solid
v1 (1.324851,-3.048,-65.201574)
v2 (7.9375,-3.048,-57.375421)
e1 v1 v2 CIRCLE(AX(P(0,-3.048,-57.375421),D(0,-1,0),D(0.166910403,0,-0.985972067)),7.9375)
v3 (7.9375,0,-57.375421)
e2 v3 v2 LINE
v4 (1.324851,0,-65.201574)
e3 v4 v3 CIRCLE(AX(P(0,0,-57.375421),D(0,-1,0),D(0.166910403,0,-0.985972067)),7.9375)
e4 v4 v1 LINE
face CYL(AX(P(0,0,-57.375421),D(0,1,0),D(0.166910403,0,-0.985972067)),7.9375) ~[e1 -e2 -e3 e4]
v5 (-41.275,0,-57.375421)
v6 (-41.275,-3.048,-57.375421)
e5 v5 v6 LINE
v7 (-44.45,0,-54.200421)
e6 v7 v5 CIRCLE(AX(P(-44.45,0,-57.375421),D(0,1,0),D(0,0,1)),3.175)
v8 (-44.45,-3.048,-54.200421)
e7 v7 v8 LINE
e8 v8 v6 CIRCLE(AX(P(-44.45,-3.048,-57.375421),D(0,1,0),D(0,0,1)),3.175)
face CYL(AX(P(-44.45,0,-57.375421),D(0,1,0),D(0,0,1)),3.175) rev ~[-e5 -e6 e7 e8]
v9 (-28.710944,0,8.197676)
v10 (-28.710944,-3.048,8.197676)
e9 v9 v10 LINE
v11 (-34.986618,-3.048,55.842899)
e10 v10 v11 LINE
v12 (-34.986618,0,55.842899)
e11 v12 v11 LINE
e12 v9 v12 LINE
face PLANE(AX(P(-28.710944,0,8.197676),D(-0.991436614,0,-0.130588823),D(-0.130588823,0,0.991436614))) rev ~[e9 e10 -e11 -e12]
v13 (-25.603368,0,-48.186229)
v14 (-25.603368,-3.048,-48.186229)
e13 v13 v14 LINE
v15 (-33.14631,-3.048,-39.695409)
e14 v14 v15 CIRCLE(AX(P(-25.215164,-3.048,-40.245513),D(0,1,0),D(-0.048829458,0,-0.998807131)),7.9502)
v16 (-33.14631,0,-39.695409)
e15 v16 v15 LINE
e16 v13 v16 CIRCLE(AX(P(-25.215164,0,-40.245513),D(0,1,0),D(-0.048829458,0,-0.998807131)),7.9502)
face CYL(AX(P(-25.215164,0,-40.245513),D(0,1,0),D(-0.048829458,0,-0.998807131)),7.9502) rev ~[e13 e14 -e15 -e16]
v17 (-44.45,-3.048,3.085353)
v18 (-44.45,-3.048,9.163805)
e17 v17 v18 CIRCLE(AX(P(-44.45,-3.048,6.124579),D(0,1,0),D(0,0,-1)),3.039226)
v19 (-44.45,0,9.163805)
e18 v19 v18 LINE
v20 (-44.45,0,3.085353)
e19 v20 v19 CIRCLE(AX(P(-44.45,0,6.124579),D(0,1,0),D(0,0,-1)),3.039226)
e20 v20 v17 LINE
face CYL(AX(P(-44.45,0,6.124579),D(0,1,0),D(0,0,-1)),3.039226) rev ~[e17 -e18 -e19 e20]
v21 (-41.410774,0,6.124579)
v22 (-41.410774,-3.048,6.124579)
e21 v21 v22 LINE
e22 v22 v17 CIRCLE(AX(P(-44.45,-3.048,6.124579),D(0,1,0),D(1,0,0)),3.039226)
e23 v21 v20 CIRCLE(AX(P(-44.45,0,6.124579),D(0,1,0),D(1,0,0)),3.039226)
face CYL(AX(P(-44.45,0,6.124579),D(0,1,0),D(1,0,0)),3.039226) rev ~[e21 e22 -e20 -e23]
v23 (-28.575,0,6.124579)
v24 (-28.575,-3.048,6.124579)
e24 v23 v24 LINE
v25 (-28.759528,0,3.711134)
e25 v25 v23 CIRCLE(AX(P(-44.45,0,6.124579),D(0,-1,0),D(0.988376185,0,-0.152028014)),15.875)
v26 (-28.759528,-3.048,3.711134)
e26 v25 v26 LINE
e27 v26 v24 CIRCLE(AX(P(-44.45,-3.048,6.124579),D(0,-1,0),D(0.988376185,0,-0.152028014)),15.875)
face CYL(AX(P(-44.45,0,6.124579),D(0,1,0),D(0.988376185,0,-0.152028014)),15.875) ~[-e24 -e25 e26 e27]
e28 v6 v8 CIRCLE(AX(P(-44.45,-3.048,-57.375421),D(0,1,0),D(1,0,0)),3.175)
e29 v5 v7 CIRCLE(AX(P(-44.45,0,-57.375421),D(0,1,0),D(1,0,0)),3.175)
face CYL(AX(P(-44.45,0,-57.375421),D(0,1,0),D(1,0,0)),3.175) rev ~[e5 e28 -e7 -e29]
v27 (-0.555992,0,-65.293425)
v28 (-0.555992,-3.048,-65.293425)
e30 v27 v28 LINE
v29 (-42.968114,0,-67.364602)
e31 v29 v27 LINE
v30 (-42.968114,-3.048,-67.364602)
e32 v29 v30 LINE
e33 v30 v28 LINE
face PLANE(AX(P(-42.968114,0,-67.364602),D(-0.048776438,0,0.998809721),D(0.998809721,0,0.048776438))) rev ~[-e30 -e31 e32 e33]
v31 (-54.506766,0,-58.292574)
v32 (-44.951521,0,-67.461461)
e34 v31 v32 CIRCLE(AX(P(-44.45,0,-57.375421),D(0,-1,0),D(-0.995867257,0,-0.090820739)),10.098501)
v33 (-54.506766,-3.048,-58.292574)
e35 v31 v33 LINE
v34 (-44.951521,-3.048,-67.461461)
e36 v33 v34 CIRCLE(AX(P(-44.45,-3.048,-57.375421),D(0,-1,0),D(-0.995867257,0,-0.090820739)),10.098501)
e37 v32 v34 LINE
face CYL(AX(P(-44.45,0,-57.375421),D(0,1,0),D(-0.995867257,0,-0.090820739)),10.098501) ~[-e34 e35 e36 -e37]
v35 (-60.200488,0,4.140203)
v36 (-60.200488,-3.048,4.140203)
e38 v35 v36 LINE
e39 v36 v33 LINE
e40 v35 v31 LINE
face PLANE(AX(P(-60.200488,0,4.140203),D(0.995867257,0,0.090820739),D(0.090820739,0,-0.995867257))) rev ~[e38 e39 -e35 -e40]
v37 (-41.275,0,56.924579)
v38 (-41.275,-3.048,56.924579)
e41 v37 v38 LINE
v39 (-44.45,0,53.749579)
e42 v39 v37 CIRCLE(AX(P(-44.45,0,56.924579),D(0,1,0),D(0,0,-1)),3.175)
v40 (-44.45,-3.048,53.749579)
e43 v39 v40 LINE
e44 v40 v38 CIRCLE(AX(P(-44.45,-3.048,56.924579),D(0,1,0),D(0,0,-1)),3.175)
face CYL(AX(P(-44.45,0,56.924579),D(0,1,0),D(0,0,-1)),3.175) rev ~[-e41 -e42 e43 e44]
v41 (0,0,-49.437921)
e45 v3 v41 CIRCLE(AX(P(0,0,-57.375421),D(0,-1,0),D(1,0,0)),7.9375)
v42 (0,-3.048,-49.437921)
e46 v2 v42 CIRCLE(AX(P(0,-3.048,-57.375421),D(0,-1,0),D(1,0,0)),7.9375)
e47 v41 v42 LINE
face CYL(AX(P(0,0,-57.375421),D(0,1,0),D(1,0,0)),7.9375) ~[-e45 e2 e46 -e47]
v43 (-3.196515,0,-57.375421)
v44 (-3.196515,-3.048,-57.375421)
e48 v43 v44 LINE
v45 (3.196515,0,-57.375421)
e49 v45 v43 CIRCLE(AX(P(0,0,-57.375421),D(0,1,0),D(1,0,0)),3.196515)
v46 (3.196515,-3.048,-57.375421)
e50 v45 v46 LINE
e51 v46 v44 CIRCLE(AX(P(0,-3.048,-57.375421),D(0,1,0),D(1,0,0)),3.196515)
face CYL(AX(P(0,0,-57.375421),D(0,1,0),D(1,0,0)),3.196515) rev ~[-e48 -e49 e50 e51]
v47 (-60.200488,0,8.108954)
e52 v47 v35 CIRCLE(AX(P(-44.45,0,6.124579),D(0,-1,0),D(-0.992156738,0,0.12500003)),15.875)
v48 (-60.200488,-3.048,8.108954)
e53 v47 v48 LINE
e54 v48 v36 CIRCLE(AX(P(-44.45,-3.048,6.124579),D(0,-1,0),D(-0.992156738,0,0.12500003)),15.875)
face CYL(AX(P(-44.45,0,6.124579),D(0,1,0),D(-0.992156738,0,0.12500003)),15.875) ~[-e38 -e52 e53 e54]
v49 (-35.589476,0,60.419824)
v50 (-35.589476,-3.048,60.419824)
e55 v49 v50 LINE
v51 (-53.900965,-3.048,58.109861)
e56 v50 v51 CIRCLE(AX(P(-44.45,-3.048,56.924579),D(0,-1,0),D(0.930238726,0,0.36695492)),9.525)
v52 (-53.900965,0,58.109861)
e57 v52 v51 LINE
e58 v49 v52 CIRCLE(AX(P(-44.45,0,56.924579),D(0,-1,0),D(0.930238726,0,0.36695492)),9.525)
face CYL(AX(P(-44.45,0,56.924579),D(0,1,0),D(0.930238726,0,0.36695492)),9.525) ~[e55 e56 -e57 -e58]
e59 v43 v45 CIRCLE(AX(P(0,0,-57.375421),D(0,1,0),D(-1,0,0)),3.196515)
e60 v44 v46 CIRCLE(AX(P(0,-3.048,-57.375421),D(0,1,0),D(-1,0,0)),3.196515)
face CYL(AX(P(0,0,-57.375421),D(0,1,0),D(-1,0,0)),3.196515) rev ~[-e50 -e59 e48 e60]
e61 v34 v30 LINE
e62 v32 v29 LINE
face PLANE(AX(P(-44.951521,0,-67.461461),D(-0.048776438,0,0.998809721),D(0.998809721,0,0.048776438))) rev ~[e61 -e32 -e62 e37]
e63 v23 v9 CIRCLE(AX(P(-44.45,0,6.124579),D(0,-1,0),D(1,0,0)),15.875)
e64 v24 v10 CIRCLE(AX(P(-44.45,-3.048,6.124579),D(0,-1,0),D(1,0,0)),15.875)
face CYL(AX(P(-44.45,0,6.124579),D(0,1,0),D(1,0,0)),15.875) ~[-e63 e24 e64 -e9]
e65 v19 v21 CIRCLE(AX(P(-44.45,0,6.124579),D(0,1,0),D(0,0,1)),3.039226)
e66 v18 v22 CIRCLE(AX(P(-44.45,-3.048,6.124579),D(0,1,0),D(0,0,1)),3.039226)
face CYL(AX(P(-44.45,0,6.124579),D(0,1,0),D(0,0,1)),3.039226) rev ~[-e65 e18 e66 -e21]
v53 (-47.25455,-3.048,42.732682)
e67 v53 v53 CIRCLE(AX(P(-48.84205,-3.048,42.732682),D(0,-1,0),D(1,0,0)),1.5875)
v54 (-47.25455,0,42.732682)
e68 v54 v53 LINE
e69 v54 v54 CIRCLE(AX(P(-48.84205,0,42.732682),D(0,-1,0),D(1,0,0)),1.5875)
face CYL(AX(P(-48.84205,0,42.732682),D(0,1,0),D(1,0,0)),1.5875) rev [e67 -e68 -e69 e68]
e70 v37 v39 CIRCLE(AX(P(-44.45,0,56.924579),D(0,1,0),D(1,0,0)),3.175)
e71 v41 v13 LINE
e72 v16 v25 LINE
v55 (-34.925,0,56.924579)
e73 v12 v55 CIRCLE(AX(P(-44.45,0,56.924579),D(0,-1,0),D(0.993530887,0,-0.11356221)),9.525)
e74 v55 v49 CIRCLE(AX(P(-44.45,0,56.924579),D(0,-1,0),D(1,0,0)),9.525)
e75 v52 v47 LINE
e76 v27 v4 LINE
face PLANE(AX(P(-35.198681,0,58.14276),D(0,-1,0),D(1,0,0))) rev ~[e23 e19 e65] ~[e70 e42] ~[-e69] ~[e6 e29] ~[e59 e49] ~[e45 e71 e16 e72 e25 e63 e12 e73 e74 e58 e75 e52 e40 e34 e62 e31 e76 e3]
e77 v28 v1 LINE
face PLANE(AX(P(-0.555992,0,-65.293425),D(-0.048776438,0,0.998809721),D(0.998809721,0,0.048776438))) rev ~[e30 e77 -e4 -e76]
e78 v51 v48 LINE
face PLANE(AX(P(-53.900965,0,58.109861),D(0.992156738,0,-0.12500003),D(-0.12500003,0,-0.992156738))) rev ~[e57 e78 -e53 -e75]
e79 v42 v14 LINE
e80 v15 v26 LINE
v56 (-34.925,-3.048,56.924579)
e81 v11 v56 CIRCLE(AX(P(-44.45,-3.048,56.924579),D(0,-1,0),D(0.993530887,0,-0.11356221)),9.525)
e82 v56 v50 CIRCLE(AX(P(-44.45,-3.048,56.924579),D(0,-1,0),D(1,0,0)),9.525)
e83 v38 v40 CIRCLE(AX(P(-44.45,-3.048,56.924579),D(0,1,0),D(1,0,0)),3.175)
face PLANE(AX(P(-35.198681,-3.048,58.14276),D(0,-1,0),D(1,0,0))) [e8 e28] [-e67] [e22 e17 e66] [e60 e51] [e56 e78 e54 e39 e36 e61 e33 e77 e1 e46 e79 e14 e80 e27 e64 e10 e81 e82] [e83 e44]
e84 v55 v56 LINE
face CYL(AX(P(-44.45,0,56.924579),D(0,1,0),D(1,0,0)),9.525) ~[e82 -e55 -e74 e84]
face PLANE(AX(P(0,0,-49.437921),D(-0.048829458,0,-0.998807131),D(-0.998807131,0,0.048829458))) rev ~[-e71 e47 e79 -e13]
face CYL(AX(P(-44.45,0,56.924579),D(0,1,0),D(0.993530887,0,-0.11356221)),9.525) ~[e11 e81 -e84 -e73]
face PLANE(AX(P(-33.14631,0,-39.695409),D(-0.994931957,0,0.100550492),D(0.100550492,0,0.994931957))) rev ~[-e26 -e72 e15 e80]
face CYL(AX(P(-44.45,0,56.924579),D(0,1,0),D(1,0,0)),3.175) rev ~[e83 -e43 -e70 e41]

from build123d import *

# Parameters (mm, degrees)
F0_R     = 1.5875
F1_DEPTH = 3.048


# Not quite as in the source:
# - a feature names something its author has since deleted; it is built from what else it names


with BuildPart() as f1:
    # F0 (on Front) → F1 (new body)
    with BuildSketch(Plane.XZ):
        with BuildLine():
            Line((-35.5894761368, 60.4198244451), (-34.9866182967, 55.8428987828))
            ThreePointArc((-34.9866182967, 55.8428987828), (-34.9404170511, 56.3828619929), (-34.925, 56.9245788358))
            ThreePointArc((-34.925, 56.9245788358), (-35.092593447, 58.7035019936), (-35.5894761368, 60.4198244451))
        make_face()
        with BuildLine():
            Line((-60.2004882138, 4.1402033601), (-60.2004882138, 8.1089543114))
            ThreePointArc((-60.2004882138, 8.1089543114), (-60.325, 6.1245788358), (-60.2004882138, 4.1402033601))
        make_face()
        with BuildLine():
            ThreePointArc((-34.9866182967, 55.8428987828), (-38.1087610636, 49.8172365933), (-44.45, 47.3995788358))
            Line((-44.45, 47.3995788358), (-44.45, 21.9995788358))
            ThreePointArc((-44.45, 21.9995788358), (-33.9832619763, 18.0603662058), (-28.7109436839, 8.1976758617))
            Line((-28.7109436839, 8.1976758617), (-34.9866182967, 55.8428987828))
        make_face()
        with BuildLine():
            ThreePointArc((-44.45, -9.7504211642), (-54.950325336, -5.7816713228), (-60.2004882138, 4.1402033601))
            Line((-60.2004882138, 4.1402033601), (-54.5067664898, -58.2925744899))
            ThreePointArc((-54.5067664898, -58.2925744899), (-51.9079352447, -50.5666823428), (-44.45, -47.276920164))
            Line((-44.45, -47.276920164), (-44.45, -9.7504211642))
        make_face()
        with BuildLine():
            ThreePointArc((-34.3514989997, -57.3754211642), (-37.3092814629, -50.2347026271), (-44.45, -47.276920164))
            Line((-44.45, -47.276920164), (-44.45, -54.2004211642))
            ThreePointArc((-44.45, -54.2004211642), (-42.2049359697, -55.130357134), (-41.275, -57.3754211642))
            Line((-41.275, -57.3754211642), (-34.3514989997, -57.3754211642))
        make_face()
        with BuildLine():
            Line((-44.45, 21.9995788358), (-44.45, 47.3995788358))
            ThreePointArc((-44.45, 47.3995788358), (-51.5919689055, 50.6223645302), (-53.9009645367, 58.1098612184))
            Line((-53.9009645367, 58.1098612184), (-60.2004882138, 8.1089543114))
            ThreePointArc((-60.2004882138, 8.1089543114), (-54.950325336, 18.0308289943), (-44.45, 21.9995788358))
        make_face()
        with Locations((-48.8420496888, 42.732682374)):
            Circle(F0_R, mode=Mode.SUBTRACT)
        with BuildLine():
            ThreePointArc((-28.7109436839, 8.1976758617), (-33.9832619763, 18.0603662058), (-44.45, 21.9995788358))
            Line((-44.45, 21.9995788358), (-44.45, 9.1638046543))
            ThreePointArc((-44.45, 9.1638046543), (-42.3009428141, 8.2736360216), (-41.4107741814, 6.1245788358))
            ThreePointArc((-41.4107741814, 6.1245788358), (-42.3009428141, 3.9755216499), (-44.45, 3.0853530172))
            Line((-44.45, 3.0853530172), (-44.45, -9.7504211642))
            ThreePointArc((-44.45, -9.7504211642), (-34.1131196636, -5.9238455389), (-28.7595280627, 3.7111341226))
            ThreePointArc((-28.7595280627, 3.7111341226), (-28.6211992399, 4.91433444), (-28.575, 6.1245788358))
            ThreePointArc((-28.575, 6.1245788358), (-28.6090223784, 7.1633535905), (-28.7109436839, 8.1976758617))
        make_face()
        with BuildLine():
            ThreePointArc((-53.9009645367, 58.1098612184), (-51.5919689055, 50.6223645302), (-44.45, 47.3995788358))
            ThreePointArc((-44.45, 47.3995788358), (-38.1087610636, 49.8172365933), (-34.9866182967, 55.8428987828))
            Line((-34.9866182967, 55.8428987828), (-35.5894761368, 60.4198244451))
            ThreePointArc((-35.5894761368, 60.4198244451), (-45.6421147488, 66.37468399), (-53.9009645367, 58.1098612184))
        make_face()
        with BuildLine():
            ThreePointArc((-41.275, 56.9245788358), (-42.2049359697, 54.6795148055), (-44.45, 53.7495788358))
            ThreePointArc((-44.45, 53.7495788358), (-46.6950640303, 59.169642866), (-41.275, 56.9245788358))
        make_face(mode=Mode.SUBTRACT)
        with BuildLine():
            Line((-44.45, 9.1638046543), (-44.45, 21.9995788358))
            ThreePointArc((-44.45, 21.9995788358), (-54.950325336, 18.0308289943), (-60.2004882138, 8.1089543114))
            Line((-60.2004882138, 8.1089543114), (-60.2004882138, 4.1402033601))
            ThreePointArc((-60.2004882138, 4.1402033601), (-54.950325336, -5.7816713228), (-44.45, -9.7504211642))
            Line((-44.45, -9.7504211642), (-44.45, 3.0853530172))
            ThreePointArc((-44.45, 3.0853530172), (-47.4892258186, 6.1245788358), (-44.45, 9.1638046543))
        make_face()
        with BuildLine():
            Line((-7.9375, -57.3754211642), (-34.3514989997, -57.3754211642))
            ThreePointArc((-34.3514989997, -57.3754211642), (-36.803283354, -63.9714386739), (-42.9681138788, -67.3646021105))
            Line((-42.9681138788, -67.3646021105), (-0.5559922874, -65.2934246264))
            ThreePointArc((-0.5559922874, -65.2934246264), (-5.8059062614, -62.7879398695), (-7.9375, -57.3754211642))
        make_face()
        with BuildLine():
            ThreePointArc((-28.7595280627, 3.7111341226), (-34.1131196636, -5.9238455389), (-44.45, -9.7504211642))
            Line((-44.45, -9.7504211642), (-44.45, -47.276920164))
            ThreePointArc((-44.45, -47.276920164), (-37.3092814629, -50.2347026271), (-34.3514989997, -57.3754211642))
            Line((-34.3514989997, -57.3754211642), (-7.9375, -57.3754211642))
            ThreePointArc((-7.9375, -57.3754211642), (-5.6126600757, -51.7627610886), (0, -49.4379211642))
            Line((0, -49.4379211642), (-25.6033683849, -48.186229462))
            ThreePointArc((-25.6033683849, -48.186229462), (-31.1587660622, -45.5255963138), (-33.1463097303, -39.6954091582))
            Line((-33.1463097303, -39.6954091582), (-28.7595280627, 3.7111341226))
        make_face()
        with BuildLine():
            ThreePointArc((-44.45, -47.276920164), (-51.9079352447, -50.5666823428), (-54.5067664898, -58.2925744899))
            ThreePointArc((-54.5067664898, -58.2925744899), (-51.4418867888, -64.6619320978), (-44.9515214608, -67.4614609558))
            Line((-44.9515214608, -67.4614609558), (-42.9681138788, -67.3646021105))
            ThreePointArc((-42.9681138788, -67.3646021105), (-36.803283354, -63.9714386739), (-34.3514989997, -57.3754211642))
            Line((-34.3514989997, -57.3754211642), (-41.275, -57.3754211642))
            ThreePointArc((-41.275, -57.3754211642), (-46.6950640303, -59.6204851945), (-44.45, -54.2004211642))
            Line((-44.45, -54.2004211642), (-44.45, -47.276920164))
        make_face()
        with BuildLine():
            ThreePointArc((0, -49.4379211642), (-5.6126600757, -51.7627610886), (-7.9375, -57.3754211642))
            ThreePointArc((-7.9375, -57.3754211642), (-5.8059062614, -62.7879398695), (-0.5559922874, -65.2934246264))
            Line((-0.5559922874, -65.2934246264), (1.3248513243, -65.2015744479))
            ThreePointArc((1.3248513243, -65.2015744479), (6.0629989954, -62.4983060382), (7.9375, -57.3754211642))
            ThreePointArc((7.9375, -57.3754211642), (5.6126600757, -51.7627610886), (0, -49.4379211642))
        make_face()
        with BuildLine():
            ThreePointArc((3.1965151992, -57.3754211642), (0, -60.5719363635), (-3.1965151992, -57.3754211642))
            ThreePointArc((-3.1965151992, -57.3754211642), (0, -54.178905965), (3.1965151992, -57.3754211642))
        make_face(mode=Mode.SUBTRACT)
    extrude(amount=F1_DEPTH)


solid = f1.part
